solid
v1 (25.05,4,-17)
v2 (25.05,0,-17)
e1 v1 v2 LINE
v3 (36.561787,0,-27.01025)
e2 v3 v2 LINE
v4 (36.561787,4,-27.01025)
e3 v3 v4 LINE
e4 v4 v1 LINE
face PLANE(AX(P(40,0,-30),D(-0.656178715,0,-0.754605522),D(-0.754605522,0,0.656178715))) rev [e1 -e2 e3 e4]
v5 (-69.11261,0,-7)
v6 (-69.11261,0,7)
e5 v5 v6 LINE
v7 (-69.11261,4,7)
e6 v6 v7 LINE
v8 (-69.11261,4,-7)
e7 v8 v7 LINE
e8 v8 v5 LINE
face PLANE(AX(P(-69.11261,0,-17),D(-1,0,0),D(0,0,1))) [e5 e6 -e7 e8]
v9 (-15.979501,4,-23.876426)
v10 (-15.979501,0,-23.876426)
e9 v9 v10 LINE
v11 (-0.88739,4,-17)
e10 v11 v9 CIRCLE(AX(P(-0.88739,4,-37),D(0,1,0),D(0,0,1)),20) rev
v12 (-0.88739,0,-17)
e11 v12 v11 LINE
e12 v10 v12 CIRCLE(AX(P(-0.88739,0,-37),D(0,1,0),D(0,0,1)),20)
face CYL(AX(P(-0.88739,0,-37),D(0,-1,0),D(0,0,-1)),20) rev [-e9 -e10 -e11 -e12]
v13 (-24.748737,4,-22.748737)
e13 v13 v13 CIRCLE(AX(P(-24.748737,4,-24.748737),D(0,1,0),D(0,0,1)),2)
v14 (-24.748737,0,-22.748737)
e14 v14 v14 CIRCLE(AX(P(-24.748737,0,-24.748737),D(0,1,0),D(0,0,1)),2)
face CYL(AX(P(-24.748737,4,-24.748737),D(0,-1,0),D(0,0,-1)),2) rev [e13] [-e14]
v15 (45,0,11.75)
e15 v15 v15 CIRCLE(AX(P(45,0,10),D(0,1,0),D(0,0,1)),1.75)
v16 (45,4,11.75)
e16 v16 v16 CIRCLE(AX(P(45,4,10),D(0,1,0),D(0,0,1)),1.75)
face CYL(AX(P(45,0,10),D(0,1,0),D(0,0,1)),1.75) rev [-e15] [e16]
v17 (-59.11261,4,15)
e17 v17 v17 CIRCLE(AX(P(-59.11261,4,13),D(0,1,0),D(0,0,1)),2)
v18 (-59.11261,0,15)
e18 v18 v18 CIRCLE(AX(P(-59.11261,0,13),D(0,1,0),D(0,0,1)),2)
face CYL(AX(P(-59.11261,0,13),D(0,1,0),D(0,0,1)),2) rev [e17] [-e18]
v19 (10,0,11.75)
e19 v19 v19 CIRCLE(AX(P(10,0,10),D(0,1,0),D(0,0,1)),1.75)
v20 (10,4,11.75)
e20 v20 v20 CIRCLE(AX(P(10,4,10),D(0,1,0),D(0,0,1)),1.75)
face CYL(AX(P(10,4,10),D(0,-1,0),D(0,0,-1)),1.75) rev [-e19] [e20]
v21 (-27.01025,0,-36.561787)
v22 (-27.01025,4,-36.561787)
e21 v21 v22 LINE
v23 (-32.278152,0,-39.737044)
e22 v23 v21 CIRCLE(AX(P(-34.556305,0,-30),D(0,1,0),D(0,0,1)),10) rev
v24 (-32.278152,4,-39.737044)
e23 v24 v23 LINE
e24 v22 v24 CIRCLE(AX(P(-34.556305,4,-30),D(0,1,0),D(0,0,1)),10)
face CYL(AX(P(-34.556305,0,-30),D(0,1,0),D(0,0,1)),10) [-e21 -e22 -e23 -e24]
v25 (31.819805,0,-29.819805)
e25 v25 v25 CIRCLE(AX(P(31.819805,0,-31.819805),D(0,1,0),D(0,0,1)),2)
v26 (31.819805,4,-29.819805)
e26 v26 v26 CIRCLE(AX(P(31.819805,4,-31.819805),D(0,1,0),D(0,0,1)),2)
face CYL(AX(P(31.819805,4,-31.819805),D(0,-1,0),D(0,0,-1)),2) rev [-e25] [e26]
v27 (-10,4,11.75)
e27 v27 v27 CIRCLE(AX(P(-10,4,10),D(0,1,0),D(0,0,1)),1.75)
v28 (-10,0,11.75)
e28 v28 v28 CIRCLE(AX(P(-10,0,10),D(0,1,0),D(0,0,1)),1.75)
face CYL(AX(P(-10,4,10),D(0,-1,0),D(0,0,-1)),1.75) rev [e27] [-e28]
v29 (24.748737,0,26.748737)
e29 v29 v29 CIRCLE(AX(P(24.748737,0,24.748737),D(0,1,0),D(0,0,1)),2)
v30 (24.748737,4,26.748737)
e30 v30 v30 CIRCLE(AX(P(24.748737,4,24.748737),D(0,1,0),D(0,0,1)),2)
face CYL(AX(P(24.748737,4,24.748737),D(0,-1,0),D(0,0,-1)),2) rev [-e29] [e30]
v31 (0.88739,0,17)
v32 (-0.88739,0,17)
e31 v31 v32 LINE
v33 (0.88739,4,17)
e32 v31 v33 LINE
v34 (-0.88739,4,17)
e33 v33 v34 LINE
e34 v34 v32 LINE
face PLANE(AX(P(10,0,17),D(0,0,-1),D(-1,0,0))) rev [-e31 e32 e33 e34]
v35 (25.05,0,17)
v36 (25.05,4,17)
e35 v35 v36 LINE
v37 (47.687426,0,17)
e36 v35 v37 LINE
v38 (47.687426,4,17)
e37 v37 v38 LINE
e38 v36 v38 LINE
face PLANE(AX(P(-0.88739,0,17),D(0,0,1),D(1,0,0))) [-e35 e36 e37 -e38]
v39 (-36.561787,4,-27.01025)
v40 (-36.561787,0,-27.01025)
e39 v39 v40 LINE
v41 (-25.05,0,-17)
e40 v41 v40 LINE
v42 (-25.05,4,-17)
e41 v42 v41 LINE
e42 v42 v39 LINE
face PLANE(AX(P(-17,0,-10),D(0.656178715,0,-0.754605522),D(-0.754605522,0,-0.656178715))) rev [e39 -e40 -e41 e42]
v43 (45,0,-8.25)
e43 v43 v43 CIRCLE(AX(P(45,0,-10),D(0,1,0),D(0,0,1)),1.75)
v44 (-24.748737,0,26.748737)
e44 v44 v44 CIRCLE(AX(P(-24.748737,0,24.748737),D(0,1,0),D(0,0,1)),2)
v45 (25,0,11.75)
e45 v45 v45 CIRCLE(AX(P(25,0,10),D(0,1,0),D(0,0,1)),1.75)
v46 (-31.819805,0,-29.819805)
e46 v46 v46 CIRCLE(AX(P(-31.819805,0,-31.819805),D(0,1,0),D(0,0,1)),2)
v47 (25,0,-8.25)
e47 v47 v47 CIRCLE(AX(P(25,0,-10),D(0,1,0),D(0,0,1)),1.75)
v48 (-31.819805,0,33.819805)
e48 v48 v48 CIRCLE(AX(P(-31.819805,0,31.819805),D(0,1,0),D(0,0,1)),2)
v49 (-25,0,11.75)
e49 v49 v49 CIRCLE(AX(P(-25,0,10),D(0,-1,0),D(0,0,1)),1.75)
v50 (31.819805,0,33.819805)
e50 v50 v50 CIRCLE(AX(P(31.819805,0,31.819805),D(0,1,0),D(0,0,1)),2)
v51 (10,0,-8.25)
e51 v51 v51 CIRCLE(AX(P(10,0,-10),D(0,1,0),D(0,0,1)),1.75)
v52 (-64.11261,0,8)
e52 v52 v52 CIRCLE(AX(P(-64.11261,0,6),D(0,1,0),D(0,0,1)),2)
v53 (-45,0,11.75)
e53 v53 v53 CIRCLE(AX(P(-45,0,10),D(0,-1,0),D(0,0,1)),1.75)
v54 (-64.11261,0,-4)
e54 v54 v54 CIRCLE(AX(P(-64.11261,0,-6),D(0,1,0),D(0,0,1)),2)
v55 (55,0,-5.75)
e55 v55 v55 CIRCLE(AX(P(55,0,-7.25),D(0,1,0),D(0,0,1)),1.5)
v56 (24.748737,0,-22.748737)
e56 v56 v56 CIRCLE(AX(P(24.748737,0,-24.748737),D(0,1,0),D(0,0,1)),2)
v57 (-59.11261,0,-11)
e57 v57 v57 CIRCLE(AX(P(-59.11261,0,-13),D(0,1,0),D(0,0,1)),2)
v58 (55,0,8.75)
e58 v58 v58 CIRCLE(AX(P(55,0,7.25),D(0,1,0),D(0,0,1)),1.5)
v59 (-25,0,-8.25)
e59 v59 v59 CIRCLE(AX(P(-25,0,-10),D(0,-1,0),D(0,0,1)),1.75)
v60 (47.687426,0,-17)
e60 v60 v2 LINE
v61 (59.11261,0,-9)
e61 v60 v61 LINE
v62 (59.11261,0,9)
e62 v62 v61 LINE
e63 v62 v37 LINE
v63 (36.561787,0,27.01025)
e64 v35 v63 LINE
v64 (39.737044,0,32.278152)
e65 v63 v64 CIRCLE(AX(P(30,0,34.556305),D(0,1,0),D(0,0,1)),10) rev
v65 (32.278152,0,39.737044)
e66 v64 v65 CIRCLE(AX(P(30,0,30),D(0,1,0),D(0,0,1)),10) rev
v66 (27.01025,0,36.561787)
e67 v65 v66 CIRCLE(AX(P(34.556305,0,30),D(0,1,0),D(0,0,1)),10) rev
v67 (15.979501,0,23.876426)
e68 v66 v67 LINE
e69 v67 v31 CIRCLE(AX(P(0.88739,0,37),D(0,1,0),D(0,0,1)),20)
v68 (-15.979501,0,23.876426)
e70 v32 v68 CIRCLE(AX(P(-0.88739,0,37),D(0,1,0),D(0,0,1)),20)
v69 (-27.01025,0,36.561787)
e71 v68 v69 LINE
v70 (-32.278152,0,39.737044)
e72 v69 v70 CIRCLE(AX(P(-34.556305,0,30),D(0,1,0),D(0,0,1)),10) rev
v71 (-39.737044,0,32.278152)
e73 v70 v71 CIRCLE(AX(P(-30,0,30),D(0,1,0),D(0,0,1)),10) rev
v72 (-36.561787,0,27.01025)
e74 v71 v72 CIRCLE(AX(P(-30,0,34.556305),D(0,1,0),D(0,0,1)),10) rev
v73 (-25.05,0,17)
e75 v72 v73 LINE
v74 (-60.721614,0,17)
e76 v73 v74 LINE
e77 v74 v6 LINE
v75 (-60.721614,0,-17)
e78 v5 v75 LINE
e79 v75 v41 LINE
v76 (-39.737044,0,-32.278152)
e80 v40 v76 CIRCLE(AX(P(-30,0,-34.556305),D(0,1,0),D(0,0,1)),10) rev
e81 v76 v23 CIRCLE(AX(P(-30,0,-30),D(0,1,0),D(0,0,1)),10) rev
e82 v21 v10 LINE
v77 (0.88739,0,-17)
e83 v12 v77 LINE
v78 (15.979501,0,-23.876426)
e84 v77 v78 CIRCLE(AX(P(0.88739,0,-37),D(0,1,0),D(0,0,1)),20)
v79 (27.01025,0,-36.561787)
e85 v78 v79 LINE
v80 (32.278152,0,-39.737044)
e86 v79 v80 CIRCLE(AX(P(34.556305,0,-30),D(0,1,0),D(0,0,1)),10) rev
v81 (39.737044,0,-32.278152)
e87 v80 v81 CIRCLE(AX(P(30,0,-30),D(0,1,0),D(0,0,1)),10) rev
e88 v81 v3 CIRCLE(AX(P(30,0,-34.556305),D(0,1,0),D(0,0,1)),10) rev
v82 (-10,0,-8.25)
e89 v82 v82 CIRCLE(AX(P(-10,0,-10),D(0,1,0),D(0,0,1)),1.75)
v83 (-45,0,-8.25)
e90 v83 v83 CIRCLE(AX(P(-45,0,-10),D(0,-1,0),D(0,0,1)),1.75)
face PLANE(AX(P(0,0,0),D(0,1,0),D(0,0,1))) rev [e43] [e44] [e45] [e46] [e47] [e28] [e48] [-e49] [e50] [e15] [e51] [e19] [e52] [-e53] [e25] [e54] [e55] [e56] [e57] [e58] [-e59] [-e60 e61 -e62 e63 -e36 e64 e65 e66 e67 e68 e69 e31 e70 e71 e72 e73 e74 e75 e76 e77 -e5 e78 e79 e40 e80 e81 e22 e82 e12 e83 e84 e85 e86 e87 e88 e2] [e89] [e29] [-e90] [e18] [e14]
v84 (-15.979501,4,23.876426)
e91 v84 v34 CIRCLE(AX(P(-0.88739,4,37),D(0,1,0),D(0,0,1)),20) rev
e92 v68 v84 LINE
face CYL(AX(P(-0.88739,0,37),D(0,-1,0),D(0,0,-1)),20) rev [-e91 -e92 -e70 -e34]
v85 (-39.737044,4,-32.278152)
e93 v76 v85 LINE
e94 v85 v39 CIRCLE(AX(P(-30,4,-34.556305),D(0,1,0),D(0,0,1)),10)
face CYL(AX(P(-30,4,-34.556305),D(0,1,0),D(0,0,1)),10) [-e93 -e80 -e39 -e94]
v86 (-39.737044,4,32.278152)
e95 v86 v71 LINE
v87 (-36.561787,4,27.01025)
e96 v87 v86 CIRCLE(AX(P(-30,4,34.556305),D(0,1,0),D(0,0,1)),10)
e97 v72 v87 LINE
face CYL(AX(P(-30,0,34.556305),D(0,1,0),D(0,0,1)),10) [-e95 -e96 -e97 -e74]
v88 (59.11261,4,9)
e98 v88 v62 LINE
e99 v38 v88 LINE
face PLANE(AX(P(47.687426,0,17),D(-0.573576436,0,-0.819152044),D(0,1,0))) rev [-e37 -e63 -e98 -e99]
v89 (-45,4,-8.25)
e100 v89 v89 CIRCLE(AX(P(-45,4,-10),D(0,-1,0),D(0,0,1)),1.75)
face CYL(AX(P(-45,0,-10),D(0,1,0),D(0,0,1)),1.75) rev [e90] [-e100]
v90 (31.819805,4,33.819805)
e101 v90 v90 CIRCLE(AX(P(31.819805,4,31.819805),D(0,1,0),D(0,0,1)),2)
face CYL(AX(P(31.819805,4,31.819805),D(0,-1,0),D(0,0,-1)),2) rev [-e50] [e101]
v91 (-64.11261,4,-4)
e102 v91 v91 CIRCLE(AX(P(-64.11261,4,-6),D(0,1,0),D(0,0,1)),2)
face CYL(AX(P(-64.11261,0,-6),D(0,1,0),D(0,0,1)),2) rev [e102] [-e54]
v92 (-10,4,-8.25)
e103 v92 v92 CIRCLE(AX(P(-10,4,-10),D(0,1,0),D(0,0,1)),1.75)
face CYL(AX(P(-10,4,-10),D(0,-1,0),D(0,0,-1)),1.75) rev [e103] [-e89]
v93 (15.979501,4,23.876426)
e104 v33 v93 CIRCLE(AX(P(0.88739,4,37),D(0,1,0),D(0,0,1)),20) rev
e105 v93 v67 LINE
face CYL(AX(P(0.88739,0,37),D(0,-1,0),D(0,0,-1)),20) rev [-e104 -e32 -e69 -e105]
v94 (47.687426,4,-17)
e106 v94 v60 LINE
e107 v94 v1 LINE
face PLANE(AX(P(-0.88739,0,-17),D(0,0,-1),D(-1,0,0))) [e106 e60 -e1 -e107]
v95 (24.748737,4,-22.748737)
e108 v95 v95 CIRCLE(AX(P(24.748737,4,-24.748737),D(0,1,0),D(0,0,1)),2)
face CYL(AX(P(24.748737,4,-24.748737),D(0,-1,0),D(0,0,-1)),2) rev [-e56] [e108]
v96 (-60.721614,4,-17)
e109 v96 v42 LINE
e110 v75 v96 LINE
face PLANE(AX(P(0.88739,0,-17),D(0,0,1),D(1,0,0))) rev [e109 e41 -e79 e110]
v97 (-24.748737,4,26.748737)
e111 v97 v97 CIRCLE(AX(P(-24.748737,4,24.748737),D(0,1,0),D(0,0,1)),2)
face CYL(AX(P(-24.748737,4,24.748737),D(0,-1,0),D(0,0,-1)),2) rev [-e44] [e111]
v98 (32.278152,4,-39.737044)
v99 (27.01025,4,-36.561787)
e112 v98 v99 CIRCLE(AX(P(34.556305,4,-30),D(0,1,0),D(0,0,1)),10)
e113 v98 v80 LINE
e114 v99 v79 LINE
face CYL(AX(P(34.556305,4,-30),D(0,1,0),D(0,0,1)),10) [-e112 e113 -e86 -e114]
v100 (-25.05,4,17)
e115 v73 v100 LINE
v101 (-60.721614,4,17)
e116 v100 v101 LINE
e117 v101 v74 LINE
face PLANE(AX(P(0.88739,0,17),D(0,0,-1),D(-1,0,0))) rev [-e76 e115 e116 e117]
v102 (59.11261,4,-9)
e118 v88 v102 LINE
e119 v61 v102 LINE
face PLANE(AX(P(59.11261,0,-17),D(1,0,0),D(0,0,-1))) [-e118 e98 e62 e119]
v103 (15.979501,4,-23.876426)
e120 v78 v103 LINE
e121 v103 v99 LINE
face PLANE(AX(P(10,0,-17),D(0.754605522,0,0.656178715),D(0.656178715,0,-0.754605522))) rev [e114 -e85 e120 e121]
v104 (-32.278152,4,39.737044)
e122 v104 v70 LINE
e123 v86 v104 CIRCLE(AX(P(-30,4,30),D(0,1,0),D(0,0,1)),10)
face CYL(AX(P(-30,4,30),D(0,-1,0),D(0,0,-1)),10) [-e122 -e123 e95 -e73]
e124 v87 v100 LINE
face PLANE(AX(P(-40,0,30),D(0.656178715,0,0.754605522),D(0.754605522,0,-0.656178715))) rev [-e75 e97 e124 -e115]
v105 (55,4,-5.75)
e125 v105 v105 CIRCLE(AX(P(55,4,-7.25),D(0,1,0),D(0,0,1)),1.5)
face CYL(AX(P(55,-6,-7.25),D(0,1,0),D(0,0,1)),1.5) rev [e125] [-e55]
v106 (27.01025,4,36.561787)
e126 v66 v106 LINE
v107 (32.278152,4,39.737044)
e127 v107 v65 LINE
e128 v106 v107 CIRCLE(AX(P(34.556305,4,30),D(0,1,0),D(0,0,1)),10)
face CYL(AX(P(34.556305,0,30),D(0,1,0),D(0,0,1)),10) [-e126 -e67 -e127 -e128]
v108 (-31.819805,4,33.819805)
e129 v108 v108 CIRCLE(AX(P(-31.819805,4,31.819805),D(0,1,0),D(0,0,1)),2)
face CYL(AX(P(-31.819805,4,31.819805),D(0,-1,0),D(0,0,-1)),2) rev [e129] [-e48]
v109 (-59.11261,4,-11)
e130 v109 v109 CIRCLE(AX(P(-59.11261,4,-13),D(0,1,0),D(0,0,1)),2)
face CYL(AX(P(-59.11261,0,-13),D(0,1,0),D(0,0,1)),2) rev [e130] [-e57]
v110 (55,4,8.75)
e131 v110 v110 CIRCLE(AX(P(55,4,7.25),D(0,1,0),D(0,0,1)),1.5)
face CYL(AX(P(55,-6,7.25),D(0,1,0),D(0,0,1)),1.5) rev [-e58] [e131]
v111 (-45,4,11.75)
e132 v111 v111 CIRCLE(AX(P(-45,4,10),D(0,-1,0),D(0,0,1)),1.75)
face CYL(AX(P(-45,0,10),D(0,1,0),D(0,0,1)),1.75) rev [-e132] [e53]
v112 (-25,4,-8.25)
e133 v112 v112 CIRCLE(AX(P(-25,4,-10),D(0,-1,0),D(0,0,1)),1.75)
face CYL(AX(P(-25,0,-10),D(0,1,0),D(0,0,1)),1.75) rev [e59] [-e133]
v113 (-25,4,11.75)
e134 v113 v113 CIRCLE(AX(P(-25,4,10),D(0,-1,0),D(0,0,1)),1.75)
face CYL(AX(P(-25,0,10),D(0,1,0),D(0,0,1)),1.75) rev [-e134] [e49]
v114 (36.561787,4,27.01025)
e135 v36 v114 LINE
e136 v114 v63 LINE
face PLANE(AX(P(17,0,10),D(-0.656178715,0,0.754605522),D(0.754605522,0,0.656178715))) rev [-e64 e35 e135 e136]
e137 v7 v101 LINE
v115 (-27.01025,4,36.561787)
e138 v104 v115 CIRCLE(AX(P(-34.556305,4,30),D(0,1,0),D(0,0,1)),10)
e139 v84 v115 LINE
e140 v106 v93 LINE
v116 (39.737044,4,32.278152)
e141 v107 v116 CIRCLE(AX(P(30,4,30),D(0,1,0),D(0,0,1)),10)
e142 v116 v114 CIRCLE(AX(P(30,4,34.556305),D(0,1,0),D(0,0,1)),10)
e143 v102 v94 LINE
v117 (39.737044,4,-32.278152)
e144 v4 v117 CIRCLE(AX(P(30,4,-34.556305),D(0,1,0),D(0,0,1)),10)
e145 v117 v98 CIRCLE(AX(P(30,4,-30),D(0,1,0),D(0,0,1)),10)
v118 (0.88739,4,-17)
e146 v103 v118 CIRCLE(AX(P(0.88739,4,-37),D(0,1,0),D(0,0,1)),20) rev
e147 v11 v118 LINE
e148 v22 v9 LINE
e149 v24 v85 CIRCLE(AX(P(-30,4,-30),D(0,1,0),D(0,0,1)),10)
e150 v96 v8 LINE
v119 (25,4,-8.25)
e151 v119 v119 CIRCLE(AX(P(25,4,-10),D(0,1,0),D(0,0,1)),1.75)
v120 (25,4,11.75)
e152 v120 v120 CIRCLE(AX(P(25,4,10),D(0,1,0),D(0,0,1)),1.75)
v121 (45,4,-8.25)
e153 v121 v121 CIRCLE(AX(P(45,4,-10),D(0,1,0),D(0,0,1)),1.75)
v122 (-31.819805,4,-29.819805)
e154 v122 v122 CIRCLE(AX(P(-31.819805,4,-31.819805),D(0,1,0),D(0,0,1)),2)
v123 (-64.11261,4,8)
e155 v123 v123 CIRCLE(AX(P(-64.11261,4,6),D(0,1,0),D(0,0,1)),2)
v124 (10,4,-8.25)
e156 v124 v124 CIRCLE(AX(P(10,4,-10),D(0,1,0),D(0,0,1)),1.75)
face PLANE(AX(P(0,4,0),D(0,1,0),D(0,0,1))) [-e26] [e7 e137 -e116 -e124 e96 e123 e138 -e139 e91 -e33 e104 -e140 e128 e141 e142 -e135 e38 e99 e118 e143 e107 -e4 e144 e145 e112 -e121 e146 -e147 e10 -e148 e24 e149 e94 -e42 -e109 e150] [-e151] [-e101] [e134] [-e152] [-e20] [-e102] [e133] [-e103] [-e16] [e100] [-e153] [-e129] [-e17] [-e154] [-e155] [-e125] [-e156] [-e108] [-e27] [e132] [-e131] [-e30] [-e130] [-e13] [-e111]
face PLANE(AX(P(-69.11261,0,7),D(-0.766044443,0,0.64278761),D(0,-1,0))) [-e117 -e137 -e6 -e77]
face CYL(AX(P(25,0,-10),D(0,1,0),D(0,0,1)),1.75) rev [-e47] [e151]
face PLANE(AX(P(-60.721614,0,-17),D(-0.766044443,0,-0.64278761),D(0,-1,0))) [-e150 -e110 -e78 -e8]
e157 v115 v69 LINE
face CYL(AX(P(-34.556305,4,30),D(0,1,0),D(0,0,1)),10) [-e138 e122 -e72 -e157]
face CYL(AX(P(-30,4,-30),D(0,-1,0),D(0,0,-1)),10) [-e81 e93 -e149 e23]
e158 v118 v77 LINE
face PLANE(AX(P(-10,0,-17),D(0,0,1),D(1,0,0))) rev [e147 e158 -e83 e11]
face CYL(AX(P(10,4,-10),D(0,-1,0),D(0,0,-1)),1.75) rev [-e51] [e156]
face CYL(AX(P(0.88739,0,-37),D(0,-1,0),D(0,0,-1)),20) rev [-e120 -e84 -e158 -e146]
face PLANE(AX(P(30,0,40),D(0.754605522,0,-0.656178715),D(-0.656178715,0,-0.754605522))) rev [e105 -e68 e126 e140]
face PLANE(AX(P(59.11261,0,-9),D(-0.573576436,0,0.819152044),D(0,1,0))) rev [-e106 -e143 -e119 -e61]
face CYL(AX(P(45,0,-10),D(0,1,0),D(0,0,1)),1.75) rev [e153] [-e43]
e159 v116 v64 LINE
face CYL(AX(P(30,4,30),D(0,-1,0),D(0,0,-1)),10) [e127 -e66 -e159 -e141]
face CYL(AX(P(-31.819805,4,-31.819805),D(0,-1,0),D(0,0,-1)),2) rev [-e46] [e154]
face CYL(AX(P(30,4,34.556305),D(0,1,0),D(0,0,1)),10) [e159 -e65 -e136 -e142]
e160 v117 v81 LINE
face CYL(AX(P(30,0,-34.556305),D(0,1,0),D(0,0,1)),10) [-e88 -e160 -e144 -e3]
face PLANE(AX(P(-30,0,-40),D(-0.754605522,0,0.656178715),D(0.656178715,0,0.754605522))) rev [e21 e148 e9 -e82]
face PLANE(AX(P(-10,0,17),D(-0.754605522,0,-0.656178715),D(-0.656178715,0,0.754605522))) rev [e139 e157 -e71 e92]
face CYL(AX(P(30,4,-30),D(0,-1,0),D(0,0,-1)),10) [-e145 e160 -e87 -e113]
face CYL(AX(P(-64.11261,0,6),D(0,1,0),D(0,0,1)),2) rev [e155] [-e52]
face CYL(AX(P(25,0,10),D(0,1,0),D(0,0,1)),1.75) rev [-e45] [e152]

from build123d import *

# Parameters (mm, degrees)
SKETCH1_W           = 80
SKETCH1_H           = 80
SKETCH1_R           = 2
SKETCH1_R_2         = 1.75
BOSS_EXTRUDE1_DEPTH = 4
CUT_EXTRUDE2_DEPTH  = 57.709787515
FILLET1_R           = 10
FILLET2_R           = 20
BOSS_EXTRUDE3_DEPTH = 4
SKETCH6_R           = 1.75
CUT_EXTRUDE3_DEPTH  = 4
SKETCH7_R           = 1.5
CUT_EXTRUDE4_DEPTH  = 10
CHAMFER1_SIZE       = 8
CHAMFER1_SIZE2      = 11.425184054
SKETCH8_W           = 10
SKETCH8_H           = 34
BOSS_EXTRUDE4_DEPTH = 4
SKETCH9_R           = 2
CUT_EXTRUDE5_DEPTH  = 4
CHAMFER2_SIZE       = 10
CHAMFER2_SIZE2      = 8.390996312


with BuildPart() as part:
    # Sketch1 → Boss-Extrude1 (new body)
    with BuildSketch(Plane(origin=(0, 0, 0), x_dir=(1, 0, 0), z_dir=(0, 1, 0))):
        Rectangle(SKETCH1_W, SKETCH1_H)
        with Locations(Location((-24.748737342, 24.748737342, 0), (0, 0, 270))):
            Circle(SKETCH1_R, mode=Mode.SUBTRACT)
        with Locations(Location((24.748737342, 24.748737342, 0), (0, 0, 270))):
            Circle(SKETCH1_R, mode=Mode.SUBTRACT)
        with Locations(Location((24.748737342, -24.748737342, 0), (0, 0, 270))):
            Circle(SKETCH1_R, mode=Mode.SUBTRACT)
        with Locations(Location((-24.748737342, -24.748737342, 0), (0, 0, 270))):
            Circle(SKETCH1_R, mode=Mode.SUBTRACT)
        with Locations(Location((-10, 10, 0), (0, 0, 270))):
            Circle(SKETCH1_R_2, mode=Mode.SUBTRACT)
        with Locations(Location((10, 10, 0), (0, 0, 270))):
            Circle(SKETCH1_R_2, mode=Mode.SUBTRACT)
        with Locations(Location((10, -10, 0), (0, 0, 270))):
            Circle(SKETCH1_R_2, mode=Mode.SUBTRACT)
        with Locations(Location((-10, -10, 0), (0, 0, 270))):
            Circle(SKETCH1_R_2, mode=Mode.SUBTRACT)
        with Locations(Location((31.819805153, 31.819805153, 0), (0, 0, 270))):
            Circle(SKETCH1_R, mode=Mode.SUBTRACT)
        with Locations(Location((-31.819805153, 31.819805153, 0), (0, 0, 270))):
            Circle(SKETCH1_R, mode=Mode.SUBTRACT)
        with Locations(Location((-31.819805153, -31.819805153, 0), (0, 0, 270))):
            Circle(SKETCH1_R, mode=Mode.SUBTRACT)
        with Locations(Location((31.819805153, -31.819805153, 0), (0, 0, 270))):
            Circle(SKETCH1_R, mode=Mode.SUBTRACT)
    extrude(amount=BOSS_EXTRUDE1_DEPTH)

    # Sketch2 → Cut-Extrude2 (cut, through all)
    with BuildSketch(Plane(origin=(0, 4, 0), x_dir=(1, 0, 0), z_dir=(0, 1, 0))):
        Polygon((-40, 30), (-40, -30), (-17, -10), (-17, 10), align=None)
        Polygon((30, 40), (-30, 40), (-10, 17), (10, 17), align=None)
        Polygon((40, -30), (40, 30), (17, 10), (17, -10), align=None)
        Polygon((-30, -40), (30, -40), (10, -17), (-10, -17), align=None)
    extrude(amount=-CUT_EXTRUDE2_DEPTH, mode=Mode.SUBTRACT)

    # Fillet1
    # the kernel refuses this fillet: 10 mm, written as the material it takes off along each edge
    with BuildSketch(Plane(origin=(-30, 15.390762292, 40), x_dir=(-1, 0, 0), z_dir=(0, -1, 0)), Plane(origin=(-40, 15.390762292, 30), x_dir=(0.754605522163505, 0, -0.6561787149247863), z_dir=(0, -1, 0)), Plane(origin=(-40, 15.390762292, -30), x_dir=(0, 0, -1), z_dir=(0, -1, 0)), Plane(origin=(-30, 15.390762292, -40), x_dir=(0.6561787149247871, 0, 0.7546055221635043), z_dir=(0, -1, 0)), Plane(origin=(30, 15.390762292, -40), x_dir=(1, 0, 0), z_dir=(0, -1, 0)), Plane(origin=(40, 15.390762292, -30), x_dir=(-0.7546055221635045, 0, 0.6561787149247867), z_dir=(0, -1, 0)), Plane(origin=(40, 15.390762292, 30), x_dir=(0, 0, 1), z_dir=(0, -1, 0))) as fillet1_piece_1:
        with BuildLine():
            CenterArc((FILLET1_R * 0.455630491663, FILLET1_R), FILLET1_R, 221.009086902, 48.990913098)
            Line((-FILLET1_R * 0.2989750305, FILLET1_R * 0.343821285075), (0, 0))
            Line((0, 0), (FILLET1_R * 0.455630491663, 0))
        make_face()
    extrude(amount=26.781524583, mode=Mode.SUBTRACT)
    with BuildSketch(Plane(origin=(-40, -25, 40), x_dir=(0, 0, -1), z_dir=(0, 1, 0)), Plane(origin=(-40, -25, -40), x_dir=(1, 0, 0), z_dir=(0, 1, 0)), Plane(origin=(40, -25, -40), x_dir=(0, 0, 1), z_dir=(0, 1, 0)), Plane(origin=(40, -25, 40), x_dir=(-1, 0, 0), z_dir=(0, 1, 0))) as fillet1_piece_2:
        with BuildLine():
            CenterArc((FILLET1_R, -FILLET1_R), FILLET1_R, 90, 90)
            Line((0, -FILLET1_R), (0, 0))
            Line((0, 0), (FILLET1_R, 0))
        make_face()
    extrude(amount=54, mode=Mode.SUBTRACT)
    with BuildSketch(Plane(origin=(30, 15.390762292, 40), x_dir=(1, 0, 0), z_dir=(0, -1, 0))) as fillet1_piece_3:
        with BuildLine():
            CenterArc((FILLET1_R * 0.455630491663, -FILLET1_R), FILLET1_R, 90, 48.990913098)
            Line((-FILLET1_R * 0.2989750305, -FILLET1_R * 0.343821285075), (0, 0))
            Line((0, 0), (FILLET1_R * 0.455630491663, 0))
        make_face()
    extrude(amount=26.781524583, mode=Mode.SUBTRACT)

    # Fillet2
    fillet2_edges = [part.edges().sort_by_distance(p)[0] for p in [
        (10, 2, 17),
        (-10, 2, 17),
        (-17, 2, 10),
        (-17, 2, -10),
        (17, 2, -10),
        (17, 2, 10),
        (-10, 2, -17),
        (10, 2, -17),
    ]]
    fillet(fillet2_edges, radius=FILLET2_R)

    # Sketch5 → Boss-Extrude3 (add)
    with BuildSketch(Plane(origin=(0, 4, 0), x_dir=(1, 0, 0), z_dir=(0, 1, 0))):
        Polygon((-0.887390167, 17), (13.289046487, 12.123524967), (13.289046487, -13.496190448), (-0.887390167, -17), (59.112609833, -17), (59.112609833, 17), align=None)
    boss_extrude3 = extrude(amount=-BOSS_EXTRUDE3_DEPTH)

    # Sketch6 → Cut-Extrude3 (cut)
    with BuildSketch(Plane(origin=(0, 4, 0), x_dir=(1, 0, 0), z_dir=(0, 1, 0))):
        with Locations(Location((25, 10, 0), (0, 0, 270))):
            Circle(SKETCH6_R)
        with Locations(Location((45, 10, 0), (0, 0, 270))):
            Circle(SKETCH6_R)
        with Locations(Location((25, -10, 0), (0, 0, 270))):
            Circle(SKETCH6_R)
        with Locations(Location((45, -10, 0), (0, 0, 270))):
            Circle(SKETCH6_R)
    cut_extrude3 = extrude(amount=-CUT_EXTRUDE3_DEPTH, mode=Mode.SUBTRACT)

    # Mirror1: Boss-Extrude3, Cut-Extrude3 across plane
    add(boss_extrude3.mirror(Plane(origin=(0, 0, 0), x_dir=(0, 0, 1), z_dir=(1, 0, 0))))
    add(cut_extrude3.mirror(Plane(origin=(0, 0, 0), x_dir=(0, 0, 1), z_dir=(1, 0, 0))), mode=Mode.SUBTRACT)

    # Sketch7 → Cut-Extrude4 (cut)
    with BuildSketch(Plane(origin=(0, 4, 0), x_dir=(1, 0, 0), z_dir=(0, 1, 0))):
        with Locations(Location((55, 7.25, 0), (0, 0, 270))):
            Circle(SKETCH7_R)
        with Locations(Location((55, -7.25, 0), (0, 0, 270))):
            Circle(SKETCH7_R)
    extrude(amount=-CUT_EXTRUDE4_DEPTH, mode=Mode.SUBTRACT)

    # Chamfer1
    chamfer1_edges = [part.edges().sort_by_distance(p)[0] for p in [
        (59.112609833, 2, 17),
        (59.112609833, 2, -17),
    ]]
    chamfer1_side = [part.faces().sort_by_distance(p)[0] for p in [
        (59.112609833, 2, 0),
    ]]
    chamfer(chamfer1_edges, length=CHAMFER1_SIZE, length2=CHAMFER1_SIZE2, reference=chamfer1_side[0])

    # Sketch8 → Boss-Extrude4 (add)
    with BuildSketch(Plane(origin=(0, 4, 0), x_dir=(1, 0, 0), z_dir=(0, 1, 0))):
        with Locations((-64.112609833, 0)):
            Rectangle(SKETCH8_W, SKETCH8_H)
    extrude(amount=-BOSS_EXTRUDE4_DEPTH)

    # Sketch9 → Cut-Extrude5 (cut)
    with BuildSketch(Plane(origin=(0, 4, 0), x_dir=(1, 0, 0), z_dir=(0, 1, 0))):
        with Locations(Location((-64.112609833, 6, 0), (0, 0, 270))):
            Circle(SKETCH9_R)
        with Locations(Location((-64.112609833, -6, 0), (0, 0, 270))):
            Circle(SKETCH9_R)
        with Locations(Location((-59.112609833, -13, 0), (0, 0, 270))):
            Circle(SKETCH9_R)
        with Locations(Location((-59.112609833, 13, 0), (0, 0, 270))):
            Circle(SKETCH9_R)
    extrude(amount=-CUT_EXTRUDE5_DEPTH, mode=Mode.SUBTRACT)

    # Chamfer2
    chamfer2_edges = [part.edges().sort_by_distance(p)[0] for p in [
        (-69.112609833, 2, 17),
        (-69.112609833, 2, -17),
    ]]
    chamfer2_side = [part.faces().sort_by_distance(p)[0] for p in [
        (-69.112609833, 2, 0),
    ]]
    chamfer(chamfer2_edges, length=CHAMFER2_SIZE, length2=CHAMFER2_SIZE2, reference=chamfer2_side[0])


solid = part.part
